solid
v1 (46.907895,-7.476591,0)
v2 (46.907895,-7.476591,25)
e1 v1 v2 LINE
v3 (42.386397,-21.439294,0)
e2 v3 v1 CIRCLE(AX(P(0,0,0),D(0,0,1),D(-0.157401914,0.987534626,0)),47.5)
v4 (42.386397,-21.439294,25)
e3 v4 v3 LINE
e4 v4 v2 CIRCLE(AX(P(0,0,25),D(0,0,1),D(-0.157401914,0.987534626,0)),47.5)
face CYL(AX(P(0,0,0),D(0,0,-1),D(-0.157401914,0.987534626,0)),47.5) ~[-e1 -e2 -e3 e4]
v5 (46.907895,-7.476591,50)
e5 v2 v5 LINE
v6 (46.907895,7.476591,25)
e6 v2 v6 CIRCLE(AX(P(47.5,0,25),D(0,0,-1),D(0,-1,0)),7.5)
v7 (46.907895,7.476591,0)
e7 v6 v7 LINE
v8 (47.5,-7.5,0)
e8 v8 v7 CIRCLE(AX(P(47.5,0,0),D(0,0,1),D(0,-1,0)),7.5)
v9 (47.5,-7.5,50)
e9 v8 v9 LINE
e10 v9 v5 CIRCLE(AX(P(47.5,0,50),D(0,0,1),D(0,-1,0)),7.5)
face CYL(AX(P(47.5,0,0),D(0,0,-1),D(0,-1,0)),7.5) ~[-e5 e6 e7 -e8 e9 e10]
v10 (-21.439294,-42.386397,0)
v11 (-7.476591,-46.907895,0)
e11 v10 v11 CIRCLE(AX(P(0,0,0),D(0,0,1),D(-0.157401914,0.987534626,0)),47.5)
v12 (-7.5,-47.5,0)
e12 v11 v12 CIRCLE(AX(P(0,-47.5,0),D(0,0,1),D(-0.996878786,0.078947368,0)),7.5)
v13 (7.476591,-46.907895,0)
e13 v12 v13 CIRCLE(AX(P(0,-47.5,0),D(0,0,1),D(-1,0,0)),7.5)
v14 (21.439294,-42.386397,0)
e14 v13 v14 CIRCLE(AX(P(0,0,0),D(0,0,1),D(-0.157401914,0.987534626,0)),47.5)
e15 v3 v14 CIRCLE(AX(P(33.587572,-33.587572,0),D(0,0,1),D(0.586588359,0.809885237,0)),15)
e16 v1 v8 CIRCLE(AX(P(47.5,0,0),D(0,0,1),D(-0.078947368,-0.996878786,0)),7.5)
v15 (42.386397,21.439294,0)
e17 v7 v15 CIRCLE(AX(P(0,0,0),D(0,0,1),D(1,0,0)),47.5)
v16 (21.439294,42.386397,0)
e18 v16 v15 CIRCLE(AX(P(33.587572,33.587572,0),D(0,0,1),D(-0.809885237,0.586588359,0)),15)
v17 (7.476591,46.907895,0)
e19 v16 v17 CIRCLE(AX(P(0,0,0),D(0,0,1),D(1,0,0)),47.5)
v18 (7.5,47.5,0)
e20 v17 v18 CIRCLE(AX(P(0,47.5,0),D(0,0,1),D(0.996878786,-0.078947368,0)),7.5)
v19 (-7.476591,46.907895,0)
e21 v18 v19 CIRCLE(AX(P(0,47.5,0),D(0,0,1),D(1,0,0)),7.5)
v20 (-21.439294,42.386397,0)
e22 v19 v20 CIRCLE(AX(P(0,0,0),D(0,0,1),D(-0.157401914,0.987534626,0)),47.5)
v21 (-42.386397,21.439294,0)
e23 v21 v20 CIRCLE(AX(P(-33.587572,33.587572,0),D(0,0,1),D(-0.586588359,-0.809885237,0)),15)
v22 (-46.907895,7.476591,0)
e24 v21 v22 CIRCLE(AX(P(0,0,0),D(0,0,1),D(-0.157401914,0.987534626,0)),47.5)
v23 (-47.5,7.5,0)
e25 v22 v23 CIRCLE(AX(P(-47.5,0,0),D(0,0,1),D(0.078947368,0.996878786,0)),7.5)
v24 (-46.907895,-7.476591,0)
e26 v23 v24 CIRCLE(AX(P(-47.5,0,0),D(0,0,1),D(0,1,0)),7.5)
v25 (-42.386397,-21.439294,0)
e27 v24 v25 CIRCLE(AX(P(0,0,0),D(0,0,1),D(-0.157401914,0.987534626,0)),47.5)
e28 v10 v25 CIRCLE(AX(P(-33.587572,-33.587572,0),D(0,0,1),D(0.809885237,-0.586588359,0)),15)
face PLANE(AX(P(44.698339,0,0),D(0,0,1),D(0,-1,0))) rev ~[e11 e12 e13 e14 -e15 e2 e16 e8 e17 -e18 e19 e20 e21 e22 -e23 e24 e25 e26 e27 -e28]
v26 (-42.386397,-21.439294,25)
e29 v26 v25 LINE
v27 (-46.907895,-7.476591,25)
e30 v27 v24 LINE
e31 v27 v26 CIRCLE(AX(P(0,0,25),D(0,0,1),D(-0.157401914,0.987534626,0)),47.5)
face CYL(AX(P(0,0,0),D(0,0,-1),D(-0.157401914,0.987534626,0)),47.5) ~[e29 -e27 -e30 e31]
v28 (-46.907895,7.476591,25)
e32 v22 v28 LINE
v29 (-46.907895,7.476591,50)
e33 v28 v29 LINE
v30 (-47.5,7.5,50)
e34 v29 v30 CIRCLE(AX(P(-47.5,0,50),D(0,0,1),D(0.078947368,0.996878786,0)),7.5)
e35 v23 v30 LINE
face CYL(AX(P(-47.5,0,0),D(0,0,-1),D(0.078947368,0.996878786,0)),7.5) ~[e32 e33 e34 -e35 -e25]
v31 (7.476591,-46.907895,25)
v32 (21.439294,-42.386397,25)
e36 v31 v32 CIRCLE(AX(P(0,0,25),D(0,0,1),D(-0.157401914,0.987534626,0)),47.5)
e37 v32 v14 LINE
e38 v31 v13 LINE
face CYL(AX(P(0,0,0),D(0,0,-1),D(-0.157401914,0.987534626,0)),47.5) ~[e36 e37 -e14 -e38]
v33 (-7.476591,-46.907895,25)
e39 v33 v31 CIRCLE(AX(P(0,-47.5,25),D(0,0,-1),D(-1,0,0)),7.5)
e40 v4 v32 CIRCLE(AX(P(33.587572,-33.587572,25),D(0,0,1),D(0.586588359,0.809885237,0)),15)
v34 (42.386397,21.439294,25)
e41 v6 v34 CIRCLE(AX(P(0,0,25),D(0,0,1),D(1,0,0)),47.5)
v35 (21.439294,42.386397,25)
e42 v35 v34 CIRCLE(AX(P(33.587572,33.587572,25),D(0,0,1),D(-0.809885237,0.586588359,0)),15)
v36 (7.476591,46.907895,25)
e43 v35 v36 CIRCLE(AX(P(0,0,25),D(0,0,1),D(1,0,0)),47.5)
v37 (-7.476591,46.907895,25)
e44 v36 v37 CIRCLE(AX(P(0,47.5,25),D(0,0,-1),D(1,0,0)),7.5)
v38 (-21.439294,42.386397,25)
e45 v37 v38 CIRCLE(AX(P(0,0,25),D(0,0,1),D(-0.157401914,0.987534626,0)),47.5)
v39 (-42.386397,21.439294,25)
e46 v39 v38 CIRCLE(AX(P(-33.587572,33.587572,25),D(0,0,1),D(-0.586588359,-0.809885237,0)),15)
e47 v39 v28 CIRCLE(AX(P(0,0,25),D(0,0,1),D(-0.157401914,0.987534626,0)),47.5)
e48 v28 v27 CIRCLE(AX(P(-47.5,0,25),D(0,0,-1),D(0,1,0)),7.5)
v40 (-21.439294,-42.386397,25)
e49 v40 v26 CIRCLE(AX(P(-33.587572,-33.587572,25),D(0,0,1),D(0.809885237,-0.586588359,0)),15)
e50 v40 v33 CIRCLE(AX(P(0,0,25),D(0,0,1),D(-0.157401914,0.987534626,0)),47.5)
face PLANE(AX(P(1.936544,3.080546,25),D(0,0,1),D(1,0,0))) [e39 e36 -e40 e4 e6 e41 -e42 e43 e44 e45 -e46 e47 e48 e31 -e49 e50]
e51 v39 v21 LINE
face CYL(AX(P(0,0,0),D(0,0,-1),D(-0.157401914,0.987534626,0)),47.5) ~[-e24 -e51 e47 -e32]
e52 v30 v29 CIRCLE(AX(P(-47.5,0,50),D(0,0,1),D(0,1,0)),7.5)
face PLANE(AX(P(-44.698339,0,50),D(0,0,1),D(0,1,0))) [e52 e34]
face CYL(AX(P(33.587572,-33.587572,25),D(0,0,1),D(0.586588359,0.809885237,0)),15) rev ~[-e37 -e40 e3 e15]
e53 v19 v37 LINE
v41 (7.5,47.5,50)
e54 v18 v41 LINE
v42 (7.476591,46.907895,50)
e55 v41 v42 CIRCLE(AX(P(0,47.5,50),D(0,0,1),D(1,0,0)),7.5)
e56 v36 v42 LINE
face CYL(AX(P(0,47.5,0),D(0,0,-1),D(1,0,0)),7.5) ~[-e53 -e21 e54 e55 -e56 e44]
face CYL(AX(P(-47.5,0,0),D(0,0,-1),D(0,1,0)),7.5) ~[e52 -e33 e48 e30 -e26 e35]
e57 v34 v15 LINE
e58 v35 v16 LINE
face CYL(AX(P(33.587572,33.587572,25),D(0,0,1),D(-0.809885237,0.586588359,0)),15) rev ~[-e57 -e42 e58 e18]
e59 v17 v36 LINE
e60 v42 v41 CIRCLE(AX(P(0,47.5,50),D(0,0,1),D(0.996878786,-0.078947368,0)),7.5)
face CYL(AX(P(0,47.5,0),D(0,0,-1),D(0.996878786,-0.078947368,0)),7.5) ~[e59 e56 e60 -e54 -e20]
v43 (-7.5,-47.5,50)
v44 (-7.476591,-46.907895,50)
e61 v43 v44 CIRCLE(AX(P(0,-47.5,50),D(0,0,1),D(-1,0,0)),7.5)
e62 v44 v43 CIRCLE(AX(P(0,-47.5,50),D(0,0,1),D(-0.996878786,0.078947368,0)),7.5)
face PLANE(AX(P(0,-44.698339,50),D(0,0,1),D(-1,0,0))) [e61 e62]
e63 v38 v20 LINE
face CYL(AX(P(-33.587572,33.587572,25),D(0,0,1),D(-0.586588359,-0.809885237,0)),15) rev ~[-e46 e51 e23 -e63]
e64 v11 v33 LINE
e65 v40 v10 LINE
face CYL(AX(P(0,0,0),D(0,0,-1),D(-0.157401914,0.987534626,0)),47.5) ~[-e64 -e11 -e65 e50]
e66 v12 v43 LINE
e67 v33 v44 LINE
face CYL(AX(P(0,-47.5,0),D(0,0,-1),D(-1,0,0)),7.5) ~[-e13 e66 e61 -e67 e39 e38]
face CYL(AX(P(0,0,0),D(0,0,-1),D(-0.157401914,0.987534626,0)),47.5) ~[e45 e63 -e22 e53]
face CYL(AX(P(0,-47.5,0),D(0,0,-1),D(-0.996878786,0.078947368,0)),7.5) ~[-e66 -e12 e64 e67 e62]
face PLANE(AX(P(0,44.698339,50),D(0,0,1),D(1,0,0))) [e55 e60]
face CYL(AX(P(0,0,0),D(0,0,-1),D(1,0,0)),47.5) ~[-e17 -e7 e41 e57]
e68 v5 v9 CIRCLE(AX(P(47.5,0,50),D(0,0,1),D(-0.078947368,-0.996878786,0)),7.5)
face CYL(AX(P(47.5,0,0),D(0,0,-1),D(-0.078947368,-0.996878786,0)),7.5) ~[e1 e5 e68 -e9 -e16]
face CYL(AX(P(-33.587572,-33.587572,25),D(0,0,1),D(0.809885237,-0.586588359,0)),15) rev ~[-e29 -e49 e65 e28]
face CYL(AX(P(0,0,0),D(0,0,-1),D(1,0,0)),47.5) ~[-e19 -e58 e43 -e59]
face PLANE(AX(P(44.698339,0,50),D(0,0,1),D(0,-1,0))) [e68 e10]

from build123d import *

# Parameters (mm, degrees)
F1_DEPTH        = 25
F2_DEPTH        = 50
F2_COPIES_COUNT = 4
F4_DEPTH        = 25.001
F4_COPIES_COUNT = 4


# Not quite as in the source:
# - a pattern or mirror of a feature is missing from the dataset's text; its kind, count and spacing are read off the source's solid


with BuildPart() as f1:
    # F0 (on Top) → F1 (new body)
    with BuildSketch(Plane.XY):
        with BuildLine():
            ThreePointArc((-7.4765908914, 46.9078947368), (-30.8310876605, -36.1343885194), (47.5, 0))
            ThreePointArc((47.5, 0), (36.1343885194, 30.8310876605), (7.4765908914, 46.9078947368))
            ThreePointArc((7.4765908914, 46.9078947368), (0, 40), (-7.4765908914, 46.9078947368))
        make_face()
        with BuildLine():
            ThreePointArc((-7.4765908914, 46.9078947368), (0, 40), (7.4765908914, 46.9078947368))
            ThreePointArc((7.4765908914, 46.9078947368), (0, 47.5), (-7.4765908914, 46.9078947368))
        make_face()
    extrude(amount=F1_DEPTH)

    # F0 (on Top) → F2 (join)
    with BuildSketch(Plane.XY):
        with BuildLine():
            ThreePointArc((-7.4765908914, 46.9078947368), (0, 40), (7.4765908914, 46.9078947368))
            ThreePointArc((7.4765908914, 46.9078947368), (0, 47.5), (-7.4765908914, 46.9078947368))
        make_face()
        with BuildLine():
            ThreePointArc((-7.4765908914, 46.9078947368), (0, 47.5), (7.4765908914, 46.9078947368))
            ThreePointArc((7.4765908914, 46.9078947368), (7.4941454378, 47.2037160867), (7.5, 47.5))
            ThreePointArc((7.5, 47.5), (-0.2962839133, 54.9941454378), (-7.4765908914, 46.9078947368))
        make_face()
    f2 = extrude(amount=F2_DEPTH)

    # F2_copies: F2 ×4 about axis
    f2_copies_axis = Axis((0, 0, 0), (0, 0, 1))
    for i in range(1, F2_COPIES_COUNT):
        add(f2.rotate(f2_copies_axis, i * 360 / F2_COPIES_COUNT))

    # F3 (on face) → F4 (cut, through all)
    with BuildSketch(Plane.XY.offset(25)):
        with BuildLine():
            ThreePointArc((42.3863974889, 21.4392935498), (33.5875721064, 33.5875721064), (21.4392935498, 42.3863974889))
            ThreePointArc((21.4392935498, 42.3863974889), (22.9809703886, 22.9809703886), (42.3863974889, 21.4392935498))
        make_face()
    f4 = extrude(amount=-F4_DEPTH, mode=Mode.SUBTRACT)

    # F4_copies: F4 ×4 about axis
    f4_copies_axis = Axis((0, 0, 0), (0, 0, 1))
    for i in range(1, F4_COPIES_COUNT):
        add(f4.rotate(f4_copies_axis, i * 360 / F4_COPIES_COUNT), mode=Mode.SUBTRACT)


solid = f1.part
